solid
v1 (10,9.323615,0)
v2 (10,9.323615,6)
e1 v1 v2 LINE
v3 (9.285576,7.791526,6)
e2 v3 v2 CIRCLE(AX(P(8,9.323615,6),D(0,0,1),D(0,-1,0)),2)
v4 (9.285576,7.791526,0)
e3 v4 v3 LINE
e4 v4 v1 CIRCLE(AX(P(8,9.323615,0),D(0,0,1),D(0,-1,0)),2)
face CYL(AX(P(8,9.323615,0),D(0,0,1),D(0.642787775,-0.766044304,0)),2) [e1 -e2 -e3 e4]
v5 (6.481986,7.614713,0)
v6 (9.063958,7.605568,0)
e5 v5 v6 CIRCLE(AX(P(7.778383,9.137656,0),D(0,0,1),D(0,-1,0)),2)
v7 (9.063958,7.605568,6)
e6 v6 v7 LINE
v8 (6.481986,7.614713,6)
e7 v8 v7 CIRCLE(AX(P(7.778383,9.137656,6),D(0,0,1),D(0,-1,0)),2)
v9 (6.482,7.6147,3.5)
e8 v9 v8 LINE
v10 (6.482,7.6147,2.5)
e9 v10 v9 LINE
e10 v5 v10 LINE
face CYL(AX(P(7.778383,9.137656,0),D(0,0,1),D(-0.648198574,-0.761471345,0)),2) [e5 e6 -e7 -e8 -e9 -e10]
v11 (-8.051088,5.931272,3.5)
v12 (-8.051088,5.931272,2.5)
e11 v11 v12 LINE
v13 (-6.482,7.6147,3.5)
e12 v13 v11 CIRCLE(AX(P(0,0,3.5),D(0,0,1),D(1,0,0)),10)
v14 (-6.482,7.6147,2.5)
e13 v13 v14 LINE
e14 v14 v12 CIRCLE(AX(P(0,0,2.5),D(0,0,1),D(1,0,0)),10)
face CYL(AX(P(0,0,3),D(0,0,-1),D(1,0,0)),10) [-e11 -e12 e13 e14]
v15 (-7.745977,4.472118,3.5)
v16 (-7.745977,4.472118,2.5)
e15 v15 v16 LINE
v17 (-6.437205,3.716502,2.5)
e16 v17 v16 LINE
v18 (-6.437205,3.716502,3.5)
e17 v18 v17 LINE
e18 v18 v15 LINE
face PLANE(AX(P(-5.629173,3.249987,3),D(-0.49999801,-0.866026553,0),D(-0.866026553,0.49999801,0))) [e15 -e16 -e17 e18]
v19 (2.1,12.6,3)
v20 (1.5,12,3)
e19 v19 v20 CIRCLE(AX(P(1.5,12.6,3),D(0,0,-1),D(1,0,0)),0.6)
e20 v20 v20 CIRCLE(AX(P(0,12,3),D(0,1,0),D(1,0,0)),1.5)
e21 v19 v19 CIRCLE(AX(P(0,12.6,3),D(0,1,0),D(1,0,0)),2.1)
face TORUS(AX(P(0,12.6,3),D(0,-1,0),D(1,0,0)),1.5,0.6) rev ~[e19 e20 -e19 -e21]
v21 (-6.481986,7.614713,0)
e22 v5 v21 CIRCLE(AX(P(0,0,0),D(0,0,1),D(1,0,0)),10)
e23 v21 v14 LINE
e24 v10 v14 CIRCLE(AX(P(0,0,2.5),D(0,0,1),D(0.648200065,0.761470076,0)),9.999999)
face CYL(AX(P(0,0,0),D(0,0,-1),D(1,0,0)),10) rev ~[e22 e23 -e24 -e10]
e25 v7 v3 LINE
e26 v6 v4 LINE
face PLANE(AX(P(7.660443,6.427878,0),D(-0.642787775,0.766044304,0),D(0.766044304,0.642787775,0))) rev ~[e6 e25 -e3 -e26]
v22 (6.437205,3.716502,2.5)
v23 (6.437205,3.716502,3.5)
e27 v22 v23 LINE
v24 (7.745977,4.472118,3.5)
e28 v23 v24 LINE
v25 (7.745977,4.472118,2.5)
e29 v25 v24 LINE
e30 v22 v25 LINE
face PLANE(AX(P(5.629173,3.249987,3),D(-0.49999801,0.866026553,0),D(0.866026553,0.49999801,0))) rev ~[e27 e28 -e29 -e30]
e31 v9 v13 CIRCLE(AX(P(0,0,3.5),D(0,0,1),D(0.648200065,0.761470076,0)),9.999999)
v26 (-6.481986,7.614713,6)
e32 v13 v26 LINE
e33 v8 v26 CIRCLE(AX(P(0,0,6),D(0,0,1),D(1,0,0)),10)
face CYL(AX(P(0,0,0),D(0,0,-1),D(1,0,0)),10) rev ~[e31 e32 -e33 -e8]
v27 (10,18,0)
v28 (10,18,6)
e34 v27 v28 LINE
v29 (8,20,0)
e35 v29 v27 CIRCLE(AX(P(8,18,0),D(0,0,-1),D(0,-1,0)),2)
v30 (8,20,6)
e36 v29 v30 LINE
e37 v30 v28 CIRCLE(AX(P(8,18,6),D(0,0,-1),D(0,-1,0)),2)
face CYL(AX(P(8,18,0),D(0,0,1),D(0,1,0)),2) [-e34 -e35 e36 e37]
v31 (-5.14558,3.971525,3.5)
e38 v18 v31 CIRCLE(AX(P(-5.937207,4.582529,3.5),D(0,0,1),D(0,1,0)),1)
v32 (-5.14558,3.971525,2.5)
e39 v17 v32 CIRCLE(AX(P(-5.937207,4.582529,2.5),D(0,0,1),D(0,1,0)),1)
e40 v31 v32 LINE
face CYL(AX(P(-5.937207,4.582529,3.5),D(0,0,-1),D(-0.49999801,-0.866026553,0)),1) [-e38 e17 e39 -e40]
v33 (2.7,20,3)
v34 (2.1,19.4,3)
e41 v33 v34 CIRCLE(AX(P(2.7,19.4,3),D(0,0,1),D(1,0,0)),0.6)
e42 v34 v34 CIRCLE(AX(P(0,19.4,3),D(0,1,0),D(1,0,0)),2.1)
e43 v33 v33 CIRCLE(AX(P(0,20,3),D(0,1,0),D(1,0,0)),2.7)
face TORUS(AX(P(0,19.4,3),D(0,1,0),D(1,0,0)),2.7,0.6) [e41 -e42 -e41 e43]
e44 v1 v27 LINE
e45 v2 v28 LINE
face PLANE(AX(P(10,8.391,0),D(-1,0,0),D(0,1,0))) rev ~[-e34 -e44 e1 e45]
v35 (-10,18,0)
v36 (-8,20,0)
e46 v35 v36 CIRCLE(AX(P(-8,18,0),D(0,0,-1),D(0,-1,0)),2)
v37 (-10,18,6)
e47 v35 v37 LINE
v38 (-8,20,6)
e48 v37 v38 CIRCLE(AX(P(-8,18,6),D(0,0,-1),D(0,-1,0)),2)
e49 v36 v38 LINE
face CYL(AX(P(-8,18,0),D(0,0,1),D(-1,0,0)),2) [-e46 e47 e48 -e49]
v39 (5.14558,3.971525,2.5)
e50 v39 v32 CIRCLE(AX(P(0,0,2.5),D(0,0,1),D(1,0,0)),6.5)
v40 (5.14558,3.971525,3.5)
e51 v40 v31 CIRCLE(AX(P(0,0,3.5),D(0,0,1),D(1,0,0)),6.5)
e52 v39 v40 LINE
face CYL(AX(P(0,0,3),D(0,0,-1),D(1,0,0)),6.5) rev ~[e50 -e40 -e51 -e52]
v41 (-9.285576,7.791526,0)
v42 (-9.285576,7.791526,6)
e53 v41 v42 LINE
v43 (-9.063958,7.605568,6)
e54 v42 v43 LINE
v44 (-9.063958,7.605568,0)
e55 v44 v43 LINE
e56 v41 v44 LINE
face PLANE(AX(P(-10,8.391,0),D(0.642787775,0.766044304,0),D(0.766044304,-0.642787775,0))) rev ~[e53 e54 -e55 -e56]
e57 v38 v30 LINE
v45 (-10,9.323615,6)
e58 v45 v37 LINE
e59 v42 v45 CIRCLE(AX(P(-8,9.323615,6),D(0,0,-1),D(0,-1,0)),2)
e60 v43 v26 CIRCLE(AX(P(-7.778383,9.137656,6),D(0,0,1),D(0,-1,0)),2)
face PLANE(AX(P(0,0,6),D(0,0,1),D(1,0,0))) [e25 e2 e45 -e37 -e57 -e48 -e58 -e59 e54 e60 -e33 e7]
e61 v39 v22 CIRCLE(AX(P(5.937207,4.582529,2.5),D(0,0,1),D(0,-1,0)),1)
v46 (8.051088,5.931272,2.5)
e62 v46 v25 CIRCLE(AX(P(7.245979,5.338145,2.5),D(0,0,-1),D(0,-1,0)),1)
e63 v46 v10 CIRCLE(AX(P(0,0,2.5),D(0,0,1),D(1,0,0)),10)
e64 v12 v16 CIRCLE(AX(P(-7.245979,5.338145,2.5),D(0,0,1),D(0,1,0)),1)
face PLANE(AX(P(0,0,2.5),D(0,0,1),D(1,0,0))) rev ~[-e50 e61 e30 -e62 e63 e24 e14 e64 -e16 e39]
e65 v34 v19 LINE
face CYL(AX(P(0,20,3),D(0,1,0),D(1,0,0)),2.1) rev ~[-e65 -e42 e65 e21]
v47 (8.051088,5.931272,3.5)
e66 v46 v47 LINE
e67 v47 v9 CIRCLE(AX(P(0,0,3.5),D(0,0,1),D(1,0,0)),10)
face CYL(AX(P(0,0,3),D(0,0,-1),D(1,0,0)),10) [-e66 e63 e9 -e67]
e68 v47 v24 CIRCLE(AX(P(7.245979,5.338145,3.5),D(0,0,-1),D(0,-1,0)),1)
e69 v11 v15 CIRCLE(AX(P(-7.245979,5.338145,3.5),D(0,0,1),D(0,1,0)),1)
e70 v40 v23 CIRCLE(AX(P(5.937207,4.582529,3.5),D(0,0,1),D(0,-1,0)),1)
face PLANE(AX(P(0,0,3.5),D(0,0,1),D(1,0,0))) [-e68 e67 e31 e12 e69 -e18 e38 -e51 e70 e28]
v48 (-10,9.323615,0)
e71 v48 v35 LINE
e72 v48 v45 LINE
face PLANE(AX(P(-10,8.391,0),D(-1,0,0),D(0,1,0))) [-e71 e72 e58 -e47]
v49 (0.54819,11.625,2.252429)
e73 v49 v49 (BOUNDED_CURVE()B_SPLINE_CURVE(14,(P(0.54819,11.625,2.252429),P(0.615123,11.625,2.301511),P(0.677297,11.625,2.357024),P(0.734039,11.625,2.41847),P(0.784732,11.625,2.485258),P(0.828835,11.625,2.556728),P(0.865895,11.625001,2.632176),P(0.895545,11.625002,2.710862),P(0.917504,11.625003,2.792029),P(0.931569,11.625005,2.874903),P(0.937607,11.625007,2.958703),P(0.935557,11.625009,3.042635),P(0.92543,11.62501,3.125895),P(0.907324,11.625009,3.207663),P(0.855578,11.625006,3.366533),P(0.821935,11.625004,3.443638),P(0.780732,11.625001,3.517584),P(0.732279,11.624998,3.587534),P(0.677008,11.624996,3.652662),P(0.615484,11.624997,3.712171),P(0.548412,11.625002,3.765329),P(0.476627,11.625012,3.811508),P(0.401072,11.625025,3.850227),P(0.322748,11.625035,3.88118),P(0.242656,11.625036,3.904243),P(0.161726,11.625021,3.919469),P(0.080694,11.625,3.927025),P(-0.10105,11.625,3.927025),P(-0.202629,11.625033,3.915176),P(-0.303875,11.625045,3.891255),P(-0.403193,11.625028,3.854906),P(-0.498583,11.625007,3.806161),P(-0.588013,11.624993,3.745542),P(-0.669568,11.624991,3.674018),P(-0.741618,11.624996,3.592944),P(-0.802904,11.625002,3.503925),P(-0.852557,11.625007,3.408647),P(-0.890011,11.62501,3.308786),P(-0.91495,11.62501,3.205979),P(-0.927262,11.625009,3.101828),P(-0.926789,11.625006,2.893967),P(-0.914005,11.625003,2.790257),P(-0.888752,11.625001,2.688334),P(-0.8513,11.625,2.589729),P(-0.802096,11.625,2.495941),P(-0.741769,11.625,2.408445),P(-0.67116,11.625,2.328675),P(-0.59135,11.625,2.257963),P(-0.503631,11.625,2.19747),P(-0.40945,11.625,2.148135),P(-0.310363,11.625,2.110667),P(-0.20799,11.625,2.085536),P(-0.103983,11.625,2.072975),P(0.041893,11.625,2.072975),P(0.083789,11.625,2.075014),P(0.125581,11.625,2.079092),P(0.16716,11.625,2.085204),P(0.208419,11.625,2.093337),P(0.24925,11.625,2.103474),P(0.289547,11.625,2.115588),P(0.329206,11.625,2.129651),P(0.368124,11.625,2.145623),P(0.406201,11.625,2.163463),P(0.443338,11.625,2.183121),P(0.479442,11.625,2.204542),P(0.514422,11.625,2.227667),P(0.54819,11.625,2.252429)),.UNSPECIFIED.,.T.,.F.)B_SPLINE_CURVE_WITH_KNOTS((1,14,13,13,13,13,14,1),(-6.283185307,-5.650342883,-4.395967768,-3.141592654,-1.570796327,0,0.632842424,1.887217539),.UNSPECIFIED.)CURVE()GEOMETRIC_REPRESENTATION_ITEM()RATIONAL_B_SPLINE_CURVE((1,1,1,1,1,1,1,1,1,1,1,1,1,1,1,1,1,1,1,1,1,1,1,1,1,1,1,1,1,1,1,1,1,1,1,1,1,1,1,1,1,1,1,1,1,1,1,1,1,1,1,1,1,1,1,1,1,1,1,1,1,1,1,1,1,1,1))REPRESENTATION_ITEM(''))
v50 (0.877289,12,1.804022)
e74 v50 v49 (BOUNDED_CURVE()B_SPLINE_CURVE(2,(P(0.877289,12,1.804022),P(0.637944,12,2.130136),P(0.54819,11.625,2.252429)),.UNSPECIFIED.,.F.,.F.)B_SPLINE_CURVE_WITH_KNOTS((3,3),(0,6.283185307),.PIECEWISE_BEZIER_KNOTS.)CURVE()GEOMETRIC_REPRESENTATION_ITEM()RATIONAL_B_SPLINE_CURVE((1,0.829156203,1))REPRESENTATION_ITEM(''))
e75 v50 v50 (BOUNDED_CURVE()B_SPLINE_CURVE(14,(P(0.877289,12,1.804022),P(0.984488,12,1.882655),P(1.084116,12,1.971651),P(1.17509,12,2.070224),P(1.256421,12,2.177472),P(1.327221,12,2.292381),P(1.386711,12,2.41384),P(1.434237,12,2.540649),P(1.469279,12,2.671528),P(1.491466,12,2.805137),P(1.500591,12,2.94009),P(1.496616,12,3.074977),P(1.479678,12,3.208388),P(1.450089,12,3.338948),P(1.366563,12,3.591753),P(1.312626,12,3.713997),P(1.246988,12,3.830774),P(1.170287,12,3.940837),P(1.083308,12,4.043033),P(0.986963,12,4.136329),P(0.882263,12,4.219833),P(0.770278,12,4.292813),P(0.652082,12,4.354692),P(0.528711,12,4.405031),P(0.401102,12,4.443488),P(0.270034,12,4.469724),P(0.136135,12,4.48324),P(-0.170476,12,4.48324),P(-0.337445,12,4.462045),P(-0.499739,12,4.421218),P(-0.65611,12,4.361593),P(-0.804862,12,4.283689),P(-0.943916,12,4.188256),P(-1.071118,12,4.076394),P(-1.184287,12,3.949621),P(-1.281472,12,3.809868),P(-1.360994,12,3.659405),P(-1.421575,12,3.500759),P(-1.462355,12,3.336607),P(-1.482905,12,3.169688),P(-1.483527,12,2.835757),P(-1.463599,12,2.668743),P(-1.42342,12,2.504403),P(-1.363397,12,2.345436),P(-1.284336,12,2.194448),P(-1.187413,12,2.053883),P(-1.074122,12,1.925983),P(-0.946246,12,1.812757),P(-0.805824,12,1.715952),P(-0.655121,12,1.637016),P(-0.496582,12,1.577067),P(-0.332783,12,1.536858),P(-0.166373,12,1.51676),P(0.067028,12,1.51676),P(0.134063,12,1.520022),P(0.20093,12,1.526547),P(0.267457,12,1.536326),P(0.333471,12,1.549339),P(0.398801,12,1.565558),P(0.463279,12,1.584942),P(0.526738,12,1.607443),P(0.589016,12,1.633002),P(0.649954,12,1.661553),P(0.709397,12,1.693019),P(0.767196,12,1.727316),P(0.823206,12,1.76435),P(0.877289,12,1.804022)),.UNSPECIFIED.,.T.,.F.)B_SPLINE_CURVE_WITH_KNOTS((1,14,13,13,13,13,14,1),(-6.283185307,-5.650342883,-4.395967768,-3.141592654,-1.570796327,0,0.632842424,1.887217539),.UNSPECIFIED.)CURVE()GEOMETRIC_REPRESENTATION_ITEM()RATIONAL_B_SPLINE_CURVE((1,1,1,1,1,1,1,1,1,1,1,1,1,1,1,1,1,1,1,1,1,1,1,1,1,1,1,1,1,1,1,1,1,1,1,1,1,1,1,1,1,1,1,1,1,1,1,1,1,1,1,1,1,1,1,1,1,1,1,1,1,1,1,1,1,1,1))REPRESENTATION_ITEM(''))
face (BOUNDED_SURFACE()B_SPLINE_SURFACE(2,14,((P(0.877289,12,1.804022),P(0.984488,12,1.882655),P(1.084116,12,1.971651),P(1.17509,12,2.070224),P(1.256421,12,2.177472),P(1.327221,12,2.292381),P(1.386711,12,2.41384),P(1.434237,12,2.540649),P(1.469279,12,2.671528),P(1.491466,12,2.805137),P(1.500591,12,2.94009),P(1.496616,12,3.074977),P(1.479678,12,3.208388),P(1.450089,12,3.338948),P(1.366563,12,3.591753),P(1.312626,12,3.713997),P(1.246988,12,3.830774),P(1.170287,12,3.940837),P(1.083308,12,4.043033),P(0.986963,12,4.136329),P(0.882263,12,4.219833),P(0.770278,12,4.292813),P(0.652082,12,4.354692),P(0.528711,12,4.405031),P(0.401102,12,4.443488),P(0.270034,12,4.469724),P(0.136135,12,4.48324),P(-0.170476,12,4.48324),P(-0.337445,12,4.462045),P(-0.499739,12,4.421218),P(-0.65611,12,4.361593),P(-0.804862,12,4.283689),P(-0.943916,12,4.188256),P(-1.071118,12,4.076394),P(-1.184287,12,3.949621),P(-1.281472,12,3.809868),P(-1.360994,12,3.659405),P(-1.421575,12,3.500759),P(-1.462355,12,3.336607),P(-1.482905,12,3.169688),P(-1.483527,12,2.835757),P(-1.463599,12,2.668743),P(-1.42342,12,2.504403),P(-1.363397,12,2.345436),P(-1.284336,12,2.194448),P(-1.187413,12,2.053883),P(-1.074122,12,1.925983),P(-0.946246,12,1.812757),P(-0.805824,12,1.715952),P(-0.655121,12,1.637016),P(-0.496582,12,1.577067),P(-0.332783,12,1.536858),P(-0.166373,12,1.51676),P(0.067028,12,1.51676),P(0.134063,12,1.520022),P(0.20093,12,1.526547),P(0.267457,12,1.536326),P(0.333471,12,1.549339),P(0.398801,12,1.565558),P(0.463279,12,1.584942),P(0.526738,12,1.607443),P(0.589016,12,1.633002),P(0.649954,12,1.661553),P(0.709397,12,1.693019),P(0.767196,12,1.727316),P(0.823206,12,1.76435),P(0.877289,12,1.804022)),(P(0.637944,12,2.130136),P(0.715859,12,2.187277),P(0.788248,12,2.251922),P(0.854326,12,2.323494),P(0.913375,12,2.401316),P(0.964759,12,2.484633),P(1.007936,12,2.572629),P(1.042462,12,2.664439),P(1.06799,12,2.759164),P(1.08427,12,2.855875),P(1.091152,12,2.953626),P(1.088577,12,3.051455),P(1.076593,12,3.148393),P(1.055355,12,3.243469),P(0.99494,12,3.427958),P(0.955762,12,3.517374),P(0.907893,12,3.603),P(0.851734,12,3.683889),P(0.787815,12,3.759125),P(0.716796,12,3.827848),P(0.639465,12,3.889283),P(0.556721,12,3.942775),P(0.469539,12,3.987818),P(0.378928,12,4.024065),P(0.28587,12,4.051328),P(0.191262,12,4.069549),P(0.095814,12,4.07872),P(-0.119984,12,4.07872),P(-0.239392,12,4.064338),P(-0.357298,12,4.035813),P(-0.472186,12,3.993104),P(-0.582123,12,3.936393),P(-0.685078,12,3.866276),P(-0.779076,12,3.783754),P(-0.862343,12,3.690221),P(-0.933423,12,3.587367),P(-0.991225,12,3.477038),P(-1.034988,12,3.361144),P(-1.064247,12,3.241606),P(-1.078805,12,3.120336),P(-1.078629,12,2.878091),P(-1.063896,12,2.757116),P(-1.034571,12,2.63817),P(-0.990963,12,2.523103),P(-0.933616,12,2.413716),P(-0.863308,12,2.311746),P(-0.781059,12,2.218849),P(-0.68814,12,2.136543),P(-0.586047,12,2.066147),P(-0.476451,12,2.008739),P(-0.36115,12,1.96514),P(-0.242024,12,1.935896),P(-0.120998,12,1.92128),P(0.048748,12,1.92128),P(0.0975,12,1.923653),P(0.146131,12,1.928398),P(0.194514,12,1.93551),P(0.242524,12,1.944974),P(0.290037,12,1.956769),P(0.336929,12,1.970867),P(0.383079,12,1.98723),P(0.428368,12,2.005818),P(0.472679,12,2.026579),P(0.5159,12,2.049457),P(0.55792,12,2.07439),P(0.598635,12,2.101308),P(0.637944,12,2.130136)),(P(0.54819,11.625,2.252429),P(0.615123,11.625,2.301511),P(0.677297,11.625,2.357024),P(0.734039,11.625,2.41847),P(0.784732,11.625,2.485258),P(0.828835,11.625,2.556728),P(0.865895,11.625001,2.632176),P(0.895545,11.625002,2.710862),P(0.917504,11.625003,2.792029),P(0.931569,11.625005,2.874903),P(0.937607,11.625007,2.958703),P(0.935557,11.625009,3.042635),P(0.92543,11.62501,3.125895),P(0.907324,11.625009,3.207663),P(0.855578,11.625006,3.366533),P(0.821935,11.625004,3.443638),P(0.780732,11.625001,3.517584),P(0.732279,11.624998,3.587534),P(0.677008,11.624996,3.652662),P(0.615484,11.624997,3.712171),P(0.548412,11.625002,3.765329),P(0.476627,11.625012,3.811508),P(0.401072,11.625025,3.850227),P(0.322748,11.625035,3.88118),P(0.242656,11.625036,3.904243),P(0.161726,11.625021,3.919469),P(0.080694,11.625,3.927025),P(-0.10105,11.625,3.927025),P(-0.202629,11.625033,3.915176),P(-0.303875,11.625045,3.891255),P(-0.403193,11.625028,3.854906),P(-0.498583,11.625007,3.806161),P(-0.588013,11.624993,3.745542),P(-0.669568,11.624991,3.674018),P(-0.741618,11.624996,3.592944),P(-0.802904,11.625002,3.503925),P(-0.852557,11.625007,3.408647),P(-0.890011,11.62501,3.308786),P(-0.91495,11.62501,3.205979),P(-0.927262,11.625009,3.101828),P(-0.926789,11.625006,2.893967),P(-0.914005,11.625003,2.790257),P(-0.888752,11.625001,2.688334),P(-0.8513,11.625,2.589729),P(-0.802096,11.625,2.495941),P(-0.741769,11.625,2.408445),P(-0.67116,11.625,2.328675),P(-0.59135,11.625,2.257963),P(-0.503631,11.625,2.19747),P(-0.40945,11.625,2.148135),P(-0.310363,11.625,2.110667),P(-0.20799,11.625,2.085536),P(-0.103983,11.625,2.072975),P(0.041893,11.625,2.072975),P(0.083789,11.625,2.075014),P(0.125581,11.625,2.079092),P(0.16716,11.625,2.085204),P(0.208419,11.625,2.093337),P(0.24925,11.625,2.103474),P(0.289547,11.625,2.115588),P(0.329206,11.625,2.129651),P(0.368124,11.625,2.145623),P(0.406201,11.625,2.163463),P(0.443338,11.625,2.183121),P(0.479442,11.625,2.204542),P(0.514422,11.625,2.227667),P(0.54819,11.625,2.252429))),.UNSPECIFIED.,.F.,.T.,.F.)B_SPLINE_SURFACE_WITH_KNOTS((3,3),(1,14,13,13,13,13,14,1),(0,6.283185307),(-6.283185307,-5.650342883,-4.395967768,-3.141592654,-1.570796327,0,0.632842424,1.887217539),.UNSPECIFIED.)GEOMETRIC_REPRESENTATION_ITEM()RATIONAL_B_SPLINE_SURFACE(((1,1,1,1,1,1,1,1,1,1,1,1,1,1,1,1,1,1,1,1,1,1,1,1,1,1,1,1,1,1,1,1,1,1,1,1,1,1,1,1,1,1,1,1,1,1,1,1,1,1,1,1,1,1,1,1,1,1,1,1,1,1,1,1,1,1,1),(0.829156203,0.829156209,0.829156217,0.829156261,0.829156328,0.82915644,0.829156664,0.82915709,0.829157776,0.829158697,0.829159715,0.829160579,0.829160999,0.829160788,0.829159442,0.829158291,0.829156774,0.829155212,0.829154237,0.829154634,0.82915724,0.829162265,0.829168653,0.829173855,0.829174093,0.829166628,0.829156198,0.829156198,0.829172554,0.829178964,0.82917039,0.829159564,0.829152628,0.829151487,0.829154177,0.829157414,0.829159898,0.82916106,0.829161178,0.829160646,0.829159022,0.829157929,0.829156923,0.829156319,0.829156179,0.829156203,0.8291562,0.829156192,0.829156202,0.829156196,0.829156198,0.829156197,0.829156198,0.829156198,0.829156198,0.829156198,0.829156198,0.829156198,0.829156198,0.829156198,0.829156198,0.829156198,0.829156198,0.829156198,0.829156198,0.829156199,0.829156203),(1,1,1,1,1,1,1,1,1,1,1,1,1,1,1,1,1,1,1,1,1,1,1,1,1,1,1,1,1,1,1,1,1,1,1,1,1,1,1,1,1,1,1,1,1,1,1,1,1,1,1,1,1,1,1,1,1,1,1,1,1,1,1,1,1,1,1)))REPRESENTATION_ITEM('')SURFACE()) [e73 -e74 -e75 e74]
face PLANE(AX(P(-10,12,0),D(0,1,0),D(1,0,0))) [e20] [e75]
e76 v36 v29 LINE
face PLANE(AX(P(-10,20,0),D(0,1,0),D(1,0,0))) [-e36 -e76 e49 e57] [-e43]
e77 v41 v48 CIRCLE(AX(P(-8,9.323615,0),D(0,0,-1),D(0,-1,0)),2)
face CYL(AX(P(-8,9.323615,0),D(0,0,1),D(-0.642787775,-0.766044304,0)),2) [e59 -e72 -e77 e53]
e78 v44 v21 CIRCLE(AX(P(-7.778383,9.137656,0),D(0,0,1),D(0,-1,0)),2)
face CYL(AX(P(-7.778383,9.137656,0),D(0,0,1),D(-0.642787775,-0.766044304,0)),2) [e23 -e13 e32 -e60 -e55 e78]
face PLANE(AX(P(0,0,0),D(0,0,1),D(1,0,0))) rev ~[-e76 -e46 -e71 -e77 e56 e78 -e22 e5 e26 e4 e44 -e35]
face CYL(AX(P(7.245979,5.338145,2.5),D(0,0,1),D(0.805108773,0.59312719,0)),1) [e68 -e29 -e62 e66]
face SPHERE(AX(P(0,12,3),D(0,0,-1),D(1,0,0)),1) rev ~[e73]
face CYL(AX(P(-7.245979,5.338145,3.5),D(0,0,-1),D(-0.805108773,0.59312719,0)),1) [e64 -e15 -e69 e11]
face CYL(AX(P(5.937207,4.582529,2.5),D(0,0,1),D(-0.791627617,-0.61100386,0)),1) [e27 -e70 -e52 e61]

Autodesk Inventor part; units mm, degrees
ref_plane "YZ Plane" through (0, 0, 0) normal (1, 0, 0) x (0, 1, 0)
ref_plane "XZ Plane" through (0, 0, 0) normal (0, 1, 0) x (-1, 0, 0)
sketch "Эскиз1" plane through (0, 0, 0) normal (0, 0, 1) x (1, 0, 0)
  line L0 (0, 0) -> (-14.5, 0)
  line L1 (14.5, 0) -> (0, 0)
  line L2 (0, -16) -> (0, 26) construction
  line L3 (-20.3, 0) -> (20.3, 0) construction
  line L4 (-10, 0) -> (-10, 20)
  line L5 (10, 0) -> (10, 20)
  line L6 (-10, 20) -> (10, 20)
  line L7 (-10, 8.391) -> (0, 0)
  line L8 (0, 0) -> (10, 8.391)
  circle A0 centre (0, 0) radius 10
  point P0 (-7.6604, 6.4279)
  point P1 (7.6604, 6.4279)
  dimension "d2" = 180
  dimension "d3" = 90
  dimension "d26" = 20
  dimension "d47" = 40
  dimension "d48" = 40
  dimension "d49" = 20
extrude "Выдавливание1" add sketch "Эскиз1" along normal blind 6 contours L7 L4 L6 L5 L8 A0
sketch "Эскиз5" plane through (-10, 20, 0) normal (0, 1, 0) x (1, 0, 0)
  line L0 (10, 0) -> (10, -6) construction
  line L1 (20, -6) -> (0, -6) projected
  circle A0 centre (10, -3) radius 2.1
  dimension "d50" = 4.2
extrude "Выдавливание3" cut sketch "Эскиз5" against normal blind 8
sketch "Эскиз6" plane through (0, 12, 3) normal (0, 1, 0) x (1, 0, 0)
  circle A0 centre (0, 0) radius 2.1 projected
  circle A1 centre (0, 0) radius 1
  line L0 (0, -1) -> (0, 1)
  point P0 (0, 3)
  dimension "d53" = 2
revolve "Вращение4" cut sketch "Эскиз6" angle 360 about axis through (0, 12, 4) along (0, 0, -1) picked at (0.2078, 0.2606) contours A1 L0
fillet "Сопряжение6" radius 0.6 4 edges at (-2.1, 20, 3) (-2.1, 12, 3) (1, 12, 3) (-1, 12, 3)
fillet "Сопряжение6" radius 2 6 edges at (-7.6604, 6.4279, 3) (7.6604, 6.4279, 3) (-10, 8.391, 3) (10, 8.391, 3) (-10, 20, 3) (10, 20, 3)
ref_plane "РабПлоскость3" through (0, 0, 3) normal (0, 0, 1) x (1, 0, 0)
sketch "Эскиз7" plane through (0, 0, 3) normal (0, 0, 1) x (1, 0, 0)
  circle A0 centre (0, 0) radius 6.5
  circle A1 centre (0, 0) radius 10
  arc A2 (6.482, 7.6147) -> (-6.482, 7.6147) centre (0, 0) ccw projected
  line L0 (0, 0) -> (-8.6603, 5)
  line L1 (0, 0) -> (8.6603, 5)
  line L2 (-14, 0) -> (14, 0) construction
  point P0 (5.6292, 3.25)
  point P1 (-5.6292, 3.25)
  dimension "d57" = 13
  dimension "d61" = 30
  dimension "d62" = 30
extrude "Выдавливание4" add sketch "Эскиз7" along normal mid plane 1 contours A0 L0 A1 L1 picked at (4.8613, 7.3201)
fillet "Сопряжение7" radius 1 4 edges at (-5.6292, 3.25, 3) (5.6292, 3.25, 3) (8.6603, 5, 3) (-8.6603, 5, 3)
equation "\"d3\" = 0.5 * d2"
equation "\"d48\" = d47"
properties part number "Бегунок"
